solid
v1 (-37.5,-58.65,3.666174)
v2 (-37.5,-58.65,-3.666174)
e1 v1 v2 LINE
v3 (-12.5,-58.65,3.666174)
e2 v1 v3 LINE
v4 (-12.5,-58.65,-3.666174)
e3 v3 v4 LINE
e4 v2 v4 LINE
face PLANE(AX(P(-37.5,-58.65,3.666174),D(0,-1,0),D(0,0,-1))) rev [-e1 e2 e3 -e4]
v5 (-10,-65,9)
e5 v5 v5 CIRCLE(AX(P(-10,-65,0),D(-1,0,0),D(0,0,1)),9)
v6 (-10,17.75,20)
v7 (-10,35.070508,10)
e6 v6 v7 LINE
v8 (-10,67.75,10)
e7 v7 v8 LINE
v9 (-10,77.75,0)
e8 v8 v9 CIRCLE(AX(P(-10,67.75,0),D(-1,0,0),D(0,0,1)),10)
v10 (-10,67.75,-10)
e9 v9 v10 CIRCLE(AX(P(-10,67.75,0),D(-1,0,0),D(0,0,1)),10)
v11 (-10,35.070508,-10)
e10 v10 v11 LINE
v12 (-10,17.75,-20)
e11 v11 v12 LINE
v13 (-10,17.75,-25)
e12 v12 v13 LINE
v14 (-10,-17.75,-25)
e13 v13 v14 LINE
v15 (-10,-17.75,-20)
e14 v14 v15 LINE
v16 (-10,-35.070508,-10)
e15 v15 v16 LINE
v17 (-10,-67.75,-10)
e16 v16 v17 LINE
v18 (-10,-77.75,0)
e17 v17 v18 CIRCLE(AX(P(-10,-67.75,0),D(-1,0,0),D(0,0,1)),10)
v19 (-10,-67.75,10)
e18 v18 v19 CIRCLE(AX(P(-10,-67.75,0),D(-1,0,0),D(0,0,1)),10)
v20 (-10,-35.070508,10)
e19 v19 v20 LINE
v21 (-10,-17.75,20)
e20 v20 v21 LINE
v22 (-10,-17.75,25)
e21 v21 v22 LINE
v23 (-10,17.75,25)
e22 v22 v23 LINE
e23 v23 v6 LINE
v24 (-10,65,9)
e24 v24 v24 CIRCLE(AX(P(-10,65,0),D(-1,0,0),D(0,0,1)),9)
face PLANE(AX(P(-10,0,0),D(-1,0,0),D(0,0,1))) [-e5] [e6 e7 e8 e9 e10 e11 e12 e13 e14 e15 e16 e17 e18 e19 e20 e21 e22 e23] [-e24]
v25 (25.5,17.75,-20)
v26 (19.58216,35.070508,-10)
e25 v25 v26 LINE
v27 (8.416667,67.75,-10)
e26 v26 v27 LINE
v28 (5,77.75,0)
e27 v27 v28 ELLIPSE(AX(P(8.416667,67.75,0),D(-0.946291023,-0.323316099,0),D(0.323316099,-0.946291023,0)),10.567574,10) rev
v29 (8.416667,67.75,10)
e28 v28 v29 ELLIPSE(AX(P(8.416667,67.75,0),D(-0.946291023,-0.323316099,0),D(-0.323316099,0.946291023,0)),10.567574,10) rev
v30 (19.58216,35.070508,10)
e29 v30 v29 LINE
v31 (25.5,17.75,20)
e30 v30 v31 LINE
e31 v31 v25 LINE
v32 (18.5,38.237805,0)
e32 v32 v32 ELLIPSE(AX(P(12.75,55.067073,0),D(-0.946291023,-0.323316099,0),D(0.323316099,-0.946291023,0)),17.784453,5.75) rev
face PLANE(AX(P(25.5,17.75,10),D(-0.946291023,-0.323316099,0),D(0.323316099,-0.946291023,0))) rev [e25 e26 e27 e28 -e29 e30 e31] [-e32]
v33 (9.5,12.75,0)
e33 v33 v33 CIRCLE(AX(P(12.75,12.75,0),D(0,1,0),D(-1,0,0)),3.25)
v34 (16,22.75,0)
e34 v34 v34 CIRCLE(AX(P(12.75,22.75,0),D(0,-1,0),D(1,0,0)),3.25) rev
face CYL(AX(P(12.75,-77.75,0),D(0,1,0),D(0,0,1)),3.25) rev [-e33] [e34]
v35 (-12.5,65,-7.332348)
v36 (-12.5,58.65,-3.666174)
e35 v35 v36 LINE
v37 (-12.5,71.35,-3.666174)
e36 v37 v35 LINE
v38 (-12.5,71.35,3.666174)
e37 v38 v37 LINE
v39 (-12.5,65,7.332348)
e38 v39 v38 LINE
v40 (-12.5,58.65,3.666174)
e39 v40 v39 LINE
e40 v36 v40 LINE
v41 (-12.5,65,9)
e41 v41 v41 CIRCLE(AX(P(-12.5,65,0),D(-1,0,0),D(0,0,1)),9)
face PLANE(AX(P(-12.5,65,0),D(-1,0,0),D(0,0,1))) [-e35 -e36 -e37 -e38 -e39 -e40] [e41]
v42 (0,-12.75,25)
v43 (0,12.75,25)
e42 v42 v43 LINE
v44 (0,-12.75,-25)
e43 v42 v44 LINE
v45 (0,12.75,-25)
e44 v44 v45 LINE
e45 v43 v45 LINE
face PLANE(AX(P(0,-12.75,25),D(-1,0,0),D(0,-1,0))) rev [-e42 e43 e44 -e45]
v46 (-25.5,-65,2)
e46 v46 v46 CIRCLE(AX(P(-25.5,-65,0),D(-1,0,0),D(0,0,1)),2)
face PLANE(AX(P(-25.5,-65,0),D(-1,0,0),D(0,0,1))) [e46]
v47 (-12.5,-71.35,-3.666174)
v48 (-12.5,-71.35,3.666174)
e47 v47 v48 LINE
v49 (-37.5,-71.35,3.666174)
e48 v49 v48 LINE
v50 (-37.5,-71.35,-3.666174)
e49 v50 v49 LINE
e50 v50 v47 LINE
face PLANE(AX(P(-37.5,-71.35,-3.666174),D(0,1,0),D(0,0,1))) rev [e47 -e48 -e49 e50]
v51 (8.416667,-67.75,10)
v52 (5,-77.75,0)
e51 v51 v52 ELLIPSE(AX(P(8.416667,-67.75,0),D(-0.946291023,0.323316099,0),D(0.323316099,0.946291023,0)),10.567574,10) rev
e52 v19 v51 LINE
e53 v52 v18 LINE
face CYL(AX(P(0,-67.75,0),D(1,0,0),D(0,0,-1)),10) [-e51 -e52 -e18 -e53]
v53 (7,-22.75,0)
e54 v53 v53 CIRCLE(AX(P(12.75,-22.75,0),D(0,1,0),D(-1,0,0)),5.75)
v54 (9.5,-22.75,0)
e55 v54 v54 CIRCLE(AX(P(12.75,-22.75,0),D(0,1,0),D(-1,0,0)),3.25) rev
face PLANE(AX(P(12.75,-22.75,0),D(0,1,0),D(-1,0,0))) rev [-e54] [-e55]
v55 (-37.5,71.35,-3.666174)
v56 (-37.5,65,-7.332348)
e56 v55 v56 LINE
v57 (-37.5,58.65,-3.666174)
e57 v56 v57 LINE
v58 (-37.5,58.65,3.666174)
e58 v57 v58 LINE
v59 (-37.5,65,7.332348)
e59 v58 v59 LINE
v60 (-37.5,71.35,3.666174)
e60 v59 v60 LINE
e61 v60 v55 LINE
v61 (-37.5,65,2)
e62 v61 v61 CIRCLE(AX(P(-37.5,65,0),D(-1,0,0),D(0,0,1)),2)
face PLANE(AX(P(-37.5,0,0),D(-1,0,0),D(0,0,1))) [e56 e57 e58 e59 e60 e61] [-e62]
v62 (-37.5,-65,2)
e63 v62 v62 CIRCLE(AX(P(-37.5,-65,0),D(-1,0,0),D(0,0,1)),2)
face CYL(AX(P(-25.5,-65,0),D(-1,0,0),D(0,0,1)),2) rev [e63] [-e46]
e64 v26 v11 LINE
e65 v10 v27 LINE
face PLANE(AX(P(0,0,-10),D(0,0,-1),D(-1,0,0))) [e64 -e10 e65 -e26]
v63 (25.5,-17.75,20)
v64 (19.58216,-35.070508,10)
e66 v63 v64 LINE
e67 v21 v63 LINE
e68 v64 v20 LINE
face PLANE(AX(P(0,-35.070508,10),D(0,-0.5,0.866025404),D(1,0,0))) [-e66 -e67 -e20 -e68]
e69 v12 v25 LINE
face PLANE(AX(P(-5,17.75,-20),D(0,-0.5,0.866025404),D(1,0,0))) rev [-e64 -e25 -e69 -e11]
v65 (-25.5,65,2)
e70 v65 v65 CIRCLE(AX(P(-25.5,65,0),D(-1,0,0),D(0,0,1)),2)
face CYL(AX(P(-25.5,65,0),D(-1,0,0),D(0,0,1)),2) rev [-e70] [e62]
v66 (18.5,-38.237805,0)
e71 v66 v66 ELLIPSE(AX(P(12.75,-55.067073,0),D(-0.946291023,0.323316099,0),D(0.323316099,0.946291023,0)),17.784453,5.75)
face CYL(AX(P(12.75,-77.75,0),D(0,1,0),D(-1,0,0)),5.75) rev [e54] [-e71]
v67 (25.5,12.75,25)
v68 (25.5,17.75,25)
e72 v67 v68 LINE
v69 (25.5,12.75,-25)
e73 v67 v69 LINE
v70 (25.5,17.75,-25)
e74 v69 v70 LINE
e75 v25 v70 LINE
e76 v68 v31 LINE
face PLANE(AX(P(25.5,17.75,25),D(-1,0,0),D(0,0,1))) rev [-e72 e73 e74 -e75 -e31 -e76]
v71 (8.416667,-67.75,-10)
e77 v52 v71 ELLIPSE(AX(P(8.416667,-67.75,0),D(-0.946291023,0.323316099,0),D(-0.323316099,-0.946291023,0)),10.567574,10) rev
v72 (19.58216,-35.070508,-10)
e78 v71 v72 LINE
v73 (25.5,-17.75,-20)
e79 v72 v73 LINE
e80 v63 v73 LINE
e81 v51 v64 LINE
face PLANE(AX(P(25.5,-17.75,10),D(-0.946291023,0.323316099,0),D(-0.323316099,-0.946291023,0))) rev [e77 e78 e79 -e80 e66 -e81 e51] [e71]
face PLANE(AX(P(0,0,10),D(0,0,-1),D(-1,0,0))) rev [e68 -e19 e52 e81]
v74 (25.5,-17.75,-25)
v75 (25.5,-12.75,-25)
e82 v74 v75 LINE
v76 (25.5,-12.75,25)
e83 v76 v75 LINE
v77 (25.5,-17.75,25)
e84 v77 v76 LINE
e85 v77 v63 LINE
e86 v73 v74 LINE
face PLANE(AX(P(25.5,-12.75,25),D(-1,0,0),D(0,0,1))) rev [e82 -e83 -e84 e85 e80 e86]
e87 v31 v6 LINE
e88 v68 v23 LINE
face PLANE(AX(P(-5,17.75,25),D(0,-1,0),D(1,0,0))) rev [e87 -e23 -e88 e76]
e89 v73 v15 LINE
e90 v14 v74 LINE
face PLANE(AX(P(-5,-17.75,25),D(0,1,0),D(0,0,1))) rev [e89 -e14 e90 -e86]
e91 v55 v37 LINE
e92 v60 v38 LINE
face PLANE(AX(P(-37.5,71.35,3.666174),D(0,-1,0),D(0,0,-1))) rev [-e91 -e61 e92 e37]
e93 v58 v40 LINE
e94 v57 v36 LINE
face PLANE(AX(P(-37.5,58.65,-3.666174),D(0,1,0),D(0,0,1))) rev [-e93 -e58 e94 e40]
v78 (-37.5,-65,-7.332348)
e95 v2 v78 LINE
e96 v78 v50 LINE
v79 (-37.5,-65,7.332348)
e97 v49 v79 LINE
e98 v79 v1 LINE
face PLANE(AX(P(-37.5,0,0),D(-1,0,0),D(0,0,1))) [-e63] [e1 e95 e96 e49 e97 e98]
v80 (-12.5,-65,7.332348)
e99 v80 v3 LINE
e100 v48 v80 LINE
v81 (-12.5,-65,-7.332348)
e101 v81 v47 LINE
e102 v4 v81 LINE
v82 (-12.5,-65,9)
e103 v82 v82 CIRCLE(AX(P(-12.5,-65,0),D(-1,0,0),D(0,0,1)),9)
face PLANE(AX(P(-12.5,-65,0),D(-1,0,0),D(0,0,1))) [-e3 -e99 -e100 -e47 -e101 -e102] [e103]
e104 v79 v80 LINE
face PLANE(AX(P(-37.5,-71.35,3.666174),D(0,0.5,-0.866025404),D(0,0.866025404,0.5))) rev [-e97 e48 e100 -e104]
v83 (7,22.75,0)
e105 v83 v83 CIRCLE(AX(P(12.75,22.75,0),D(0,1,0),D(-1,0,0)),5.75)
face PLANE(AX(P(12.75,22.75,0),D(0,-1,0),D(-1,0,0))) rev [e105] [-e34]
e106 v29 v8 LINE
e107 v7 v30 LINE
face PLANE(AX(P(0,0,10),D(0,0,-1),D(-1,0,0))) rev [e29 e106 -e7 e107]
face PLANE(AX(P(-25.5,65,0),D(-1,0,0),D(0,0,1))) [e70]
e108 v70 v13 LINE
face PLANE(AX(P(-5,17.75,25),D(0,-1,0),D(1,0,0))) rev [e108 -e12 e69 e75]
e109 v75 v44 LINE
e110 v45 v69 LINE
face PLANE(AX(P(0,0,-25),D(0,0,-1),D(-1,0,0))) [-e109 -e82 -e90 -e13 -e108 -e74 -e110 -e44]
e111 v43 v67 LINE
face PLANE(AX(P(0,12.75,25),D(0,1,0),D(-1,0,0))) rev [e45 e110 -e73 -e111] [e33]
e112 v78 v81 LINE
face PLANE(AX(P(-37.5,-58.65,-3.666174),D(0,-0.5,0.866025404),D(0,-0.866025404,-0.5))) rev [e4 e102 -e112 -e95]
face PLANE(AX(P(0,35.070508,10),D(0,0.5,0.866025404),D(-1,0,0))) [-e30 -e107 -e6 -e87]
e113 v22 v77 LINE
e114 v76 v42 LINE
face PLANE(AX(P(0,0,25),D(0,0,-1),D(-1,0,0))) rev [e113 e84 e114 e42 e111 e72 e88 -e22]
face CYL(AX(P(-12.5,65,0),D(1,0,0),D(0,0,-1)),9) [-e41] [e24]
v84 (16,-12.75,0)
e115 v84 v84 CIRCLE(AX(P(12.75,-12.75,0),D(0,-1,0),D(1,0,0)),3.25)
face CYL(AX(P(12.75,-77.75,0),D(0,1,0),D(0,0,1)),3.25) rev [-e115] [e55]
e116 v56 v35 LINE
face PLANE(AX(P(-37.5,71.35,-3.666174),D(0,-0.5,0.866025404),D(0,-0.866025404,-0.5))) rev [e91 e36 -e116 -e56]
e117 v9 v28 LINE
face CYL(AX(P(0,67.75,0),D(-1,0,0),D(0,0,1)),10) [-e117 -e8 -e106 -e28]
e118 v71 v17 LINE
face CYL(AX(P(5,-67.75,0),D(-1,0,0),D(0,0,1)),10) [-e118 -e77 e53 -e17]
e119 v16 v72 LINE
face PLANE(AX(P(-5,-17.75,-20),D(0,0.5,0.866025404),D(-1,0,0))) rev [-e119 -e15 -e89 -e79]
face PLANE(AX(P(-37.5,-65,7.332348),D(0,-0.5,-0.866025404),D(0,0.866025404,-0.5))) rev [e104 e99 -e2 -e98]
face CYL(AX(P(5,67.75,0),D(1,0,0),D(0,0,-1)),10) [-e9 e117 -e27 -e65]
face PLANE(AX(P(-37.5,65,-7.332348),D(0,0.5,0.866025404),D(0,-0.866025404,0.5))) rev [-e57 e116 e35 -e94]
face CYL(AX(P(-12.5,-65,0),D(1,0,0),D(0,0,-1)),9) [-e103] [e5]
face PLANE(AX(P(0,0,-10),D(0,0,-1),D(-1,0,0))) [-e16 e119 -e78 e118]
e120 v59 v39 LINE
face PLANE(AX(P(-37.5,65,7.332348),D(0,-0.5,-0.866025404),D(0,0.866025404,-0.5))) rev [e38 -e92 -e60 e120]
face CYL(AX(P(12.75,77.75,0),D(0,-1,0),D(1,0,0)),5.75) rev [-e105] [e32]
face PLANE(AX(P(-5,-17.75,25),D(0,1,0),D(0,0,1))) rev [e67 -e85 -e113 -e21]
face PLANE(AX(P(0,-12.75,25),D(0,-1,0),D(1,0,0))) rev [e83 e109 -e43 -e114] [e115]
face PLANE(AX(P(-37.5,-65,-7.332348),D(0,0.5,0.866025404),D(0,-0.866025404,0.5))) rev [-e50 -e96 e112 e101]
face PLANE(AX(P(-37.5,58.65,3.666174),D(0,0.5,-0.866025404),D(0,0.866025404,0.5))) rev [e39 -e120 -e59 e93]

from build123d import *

# Parameters (mm, degrees)
BOSS_EXTRUDE1_DEPTH     = 25
BOSS_EXTRUDE2_DEPTH     = 10
BOSS_EXTRUDE7_DEPTH     = 5
SKETCH4_R               = 9
BOSS_EXTRUDE4_DEPTH     = 2.5
BOSS_EXTRUDE6_DEPTH     = 25
SKETCH7_R               = 2
CUT_EXTRUDE1_DEPTH      = 12
FILLET1_R               = 10
CHAMFER1_SIZE           = 17.320508076
CHAMFER1_SIZE_2         = 10
CUT_EXTRUDE2_DEPTH      = 90.868306427
CUT_EXTRUDE2_DEPTH_BACK = 90.868306427
SKETCH9_R               = 3.25
SKETCH10_R              = 5.75
CUT_EXTRUDE3_DEPTH      = 111.143088753


# Some blends are built 0.0001 mm under size
with BuildPart() as part:
    # Sketch1 → Boss-Extrude1 (new, symmetric)
    with BuildSketch(Plane.XY):
        Polygon((25.5, -12.75), (25.5, -17.75), (-5, -17.75), (-5, 17.75), (25.5, 17.75), (25.5, 12.75), (0, 12.75), (0, -12.75), align=None)
    extrude(amount=BOSS_EXTRUDE1_DEPTH, both=True)

    # Sketch2 → Boss-Extrude2 (add, symmetric)
    with BuildSketch(Plane.XY):
        Polygon((-5, 17.75), (-5, 77.75), (5, 77.75), (25.5, 17.75), align=None)
        Polygon((5, -77.75), (-5, -77.75), (-5, -17.75), (25.5, -17.75), align=None)
    extrude(amount=BOSS_EXTRUDE2_DEPTH, both=True)

    # Sketch8 → Boss-Extrude7 (add)
    with BuildSketch(Plane.ZY.offset(5)):
        Polygon((10, 17.75), (25, 17.75), (25, -17.75), (10, -17.75), (10, -77.75), (-10, -77.75), (-10, -17.75), (-25, -17.75), (-25, 17.75), (-10, 17.75), (-10, 77.75), (10, 77.75), align=None)
    extrude(amount=BOSS_EXTRUDE7_DEPTH)

    # Sketch4 → Boss-Extrude4 (add)
    with BuildSketch(Plane.ZY.offset(10)):
        with Locations((0, 65)):
            Circle(SKETCH4_R)
        with Locations((0, -65)):
            Circle(SKETCH4_R)
    extrude(amount=BOSS_EXTRUDE4_DEPTH)

    # Sketch6 → Boss-Extrude6 (add)
    with BuildSketch(Plane.ZY.offset(12.5)):
        Polygon((7.332348419, 65), (3.666174209, 71.35), (-3.666174209, 71.35), (-7.332348419, 65), (-3.666174209, 58.65), (3.666174209, 58.65), align=None)
        Polygon((7.332348419, -65), (3.666174209, -58.65), (-3.666174209, -58.65), (-7.332348419, -65), (-3.666174209, -71.35), (3.666174209, -71.35), align=None)
    extrude(amount=BOSS_EXTRUDE6_DEPTH)

    # Sketch7 → Cut-Extrude1 (cut)
    with BuildSketch(Plane.ZY.offset(37.5)):
        with Locations((0, 65)):
            Circle(SKETCH7_R)
        with Locations((0, -65)):
            Circle(SKETCH7_R)
    extrude(amount=-CUT_EXTRUDE1_DEPTH, mode=Mode.SUBTRACT)

    # Fillet1
    fillet1_edges = [part.edges().sort_by_distance(p)[0] for p in [
        (-2.5, -77.75, -10),
        (-2.5, -77.75, 10),
        (-2.5, 77.75, -10),
        (-2.5, 77.75, 10),
    ]]
    fillet(fillet1_edges, radius=FILLET1_R - 0.0001)  # a hair under: the kernel refuses the full size

    # Chamfer1
    # the kernel refuses this chamfer: 17.320508076, 10 mm, written as the material it adds along each edge
    with BuildSketch(Plane(origin=(-10, 17.75, -10), x_dir=(0, 0.999813220622208, 0.019326765612700598), z_dir=(1, 0, 0))) as chamfer1_piece_1_section:
        Polygon((CHAMFER1_SIZE * 0.999813220604, -CHAMFER1_SIZE * 0.0193267656124), (-CHAMFER1_SIZE_2 * 0.0193267656127, -CHAMFER1_SIZE_2 * 0.999813220622), (0, 0), align=None)
    chamfer1_piece_1 = extrude(amount=35.5, mode=Mode.PRIVATE)
    chamfer1_piece_1 = split(chamfer1_piece_1, bisect_by=Plane(origin=(21.828322998, 28.496371714, -13.269268631), z_dir=(-0.9462910228001215, -0.32331609945670825, 0)), keep=Keep.TOP, mode=Mode.PRIVATE)
    add(chamfer1_piece_1)
    with BuildSketch(Plane(origin=(25.5, 17.75, 10), x_dir=(0, 0.9998132206222078, -0.019326765612700598), z_dir=(-1, 0, 0))) as chamfer1_piece_2_section:
        Polygon((CHAMFER1_SIZE * 0.999813220604, -CHAMFER1_SIZE * 0.0193267656124), (-CHAMFER1_SIZE_2 * 0.0193267656127, -CHAMFER1_SIZE_2 * 0.999813220622), (0, 0), align=None)
    chamfer1_piece_2 = extrude(amount=35.5, mode=Mode.PRIVATE)
    chamfer1_piece_2 = split(chamfer1_piece_2, bisect_by=Plane(origin=(21.828322998, 28.496371714, 13.269268631), z_dir=(-0.9462910228001215, -0.32331609945670825, 0)), keep=Keep.TOP, mode=Mode.PRIVATE)
    add(chamfer1_piece_2)
    with BuildSketch(Plane(origin=(25.5, -17.75, -10), x_dir=(0, -0.9998132206222078, 0.019326765612700598), z_dir=(-1, 0, 0))) as chamfer1_piece_3_section:
        Polygon((CHAMFER1_SIZE * 0.999813220604, -CHAMFER1_SIZE * 0.0193267656124), (-CHAMFER1_SIZE_2 * 0.0193267656127, -CHAMFER1_SIZE_2 * 0.999813220622), (0, 0), align=None)
    chamfer1_piece_3 = extrude(amount=35.5, mode=Mode.PRIVATE)
    chamfer1_piece_3 = split(chamfer1_piece_3, bisect_by=Plane(origin=(21.828322998, -28.496371714, -13.269268631), z_dir=(-0.9462910228001215, 0.32331609945670825, 0)), keep=Keep.TOP, mode=Mode.PRIVATE)
    add(chamfer1_piece_3)
    with BuildSketch(Plane(origin=(-10, -17.75, 10), x_dir=(0, -0.999813220622208, -0.019326765612700695), z_dir=(1, 0, 0))) as chamfer1_piece_4_section:
        Polygon((CHAMFER1_SIZE * 0.999813220604, -CHAMFER1_SIZE * 0.0193267656124), (-CHAMFER1_SIZE_2 * 0.0193267656127, -CHAMFER1_SIZE_2 * 0.999813220622), (0, 0), align=None)
    chamfer1_piece_4 = extrude(amount=35.5, mode=Mode.PRIVATE)
    chamfer1_piece_4 = split(chamfer1_piece_4, bisect_by=Plane(origin=(21.828322998, -28.496371714, 13.269268631), z_dir=(-0.9462910228001215, 0.32331609945670825, 0)), keep=Keep.TOP, mode=Mode.PRIVATE)
    add(chamfer1_piece_4)

    # Sketch9 → Cut-Extrude2 (cut, two sides: drawn at the far end of the back side and taken through both)
    with BuildSketch(Plane(origin=(0, 0, 0), x_dir=(1, 0, 0), z_dir=(0, 1, 0)).offset(-CUT_EXTRUDE2_DEPTH_BACK)):
        with Locations((12.75, 0)):
            Circle(SKETCH9_R)
    extrude(amount=CUT_EXTRUDE2_DEPTH + CUT_EXTRUDE2_DEPTH_BACK, mode=Mode.SUBTRACT)

    # Sketch10 → Cut-Extrude3 (cut, through all)
    with BuildSketch(Plane(origin=(0, -22.75, 0), x_dir=(1, 0, 0), z_dir=(0, 1, 0))):
        with Locations(Location((12.75, 0, 0), (0, 0, 180))):
            Circle(SKETCH10_R)
    cut_extrude3 = extrude(amount=-CUT_EXTRUDE3_DEPTH, mode=Mode.SUBTRACT)

    # Mirror1: Cut-Extrude3 across plane
    add(cut_extrude3.mirror(Plane.ZX), mode=Mode.SUBTRACT)


solid = part.part
